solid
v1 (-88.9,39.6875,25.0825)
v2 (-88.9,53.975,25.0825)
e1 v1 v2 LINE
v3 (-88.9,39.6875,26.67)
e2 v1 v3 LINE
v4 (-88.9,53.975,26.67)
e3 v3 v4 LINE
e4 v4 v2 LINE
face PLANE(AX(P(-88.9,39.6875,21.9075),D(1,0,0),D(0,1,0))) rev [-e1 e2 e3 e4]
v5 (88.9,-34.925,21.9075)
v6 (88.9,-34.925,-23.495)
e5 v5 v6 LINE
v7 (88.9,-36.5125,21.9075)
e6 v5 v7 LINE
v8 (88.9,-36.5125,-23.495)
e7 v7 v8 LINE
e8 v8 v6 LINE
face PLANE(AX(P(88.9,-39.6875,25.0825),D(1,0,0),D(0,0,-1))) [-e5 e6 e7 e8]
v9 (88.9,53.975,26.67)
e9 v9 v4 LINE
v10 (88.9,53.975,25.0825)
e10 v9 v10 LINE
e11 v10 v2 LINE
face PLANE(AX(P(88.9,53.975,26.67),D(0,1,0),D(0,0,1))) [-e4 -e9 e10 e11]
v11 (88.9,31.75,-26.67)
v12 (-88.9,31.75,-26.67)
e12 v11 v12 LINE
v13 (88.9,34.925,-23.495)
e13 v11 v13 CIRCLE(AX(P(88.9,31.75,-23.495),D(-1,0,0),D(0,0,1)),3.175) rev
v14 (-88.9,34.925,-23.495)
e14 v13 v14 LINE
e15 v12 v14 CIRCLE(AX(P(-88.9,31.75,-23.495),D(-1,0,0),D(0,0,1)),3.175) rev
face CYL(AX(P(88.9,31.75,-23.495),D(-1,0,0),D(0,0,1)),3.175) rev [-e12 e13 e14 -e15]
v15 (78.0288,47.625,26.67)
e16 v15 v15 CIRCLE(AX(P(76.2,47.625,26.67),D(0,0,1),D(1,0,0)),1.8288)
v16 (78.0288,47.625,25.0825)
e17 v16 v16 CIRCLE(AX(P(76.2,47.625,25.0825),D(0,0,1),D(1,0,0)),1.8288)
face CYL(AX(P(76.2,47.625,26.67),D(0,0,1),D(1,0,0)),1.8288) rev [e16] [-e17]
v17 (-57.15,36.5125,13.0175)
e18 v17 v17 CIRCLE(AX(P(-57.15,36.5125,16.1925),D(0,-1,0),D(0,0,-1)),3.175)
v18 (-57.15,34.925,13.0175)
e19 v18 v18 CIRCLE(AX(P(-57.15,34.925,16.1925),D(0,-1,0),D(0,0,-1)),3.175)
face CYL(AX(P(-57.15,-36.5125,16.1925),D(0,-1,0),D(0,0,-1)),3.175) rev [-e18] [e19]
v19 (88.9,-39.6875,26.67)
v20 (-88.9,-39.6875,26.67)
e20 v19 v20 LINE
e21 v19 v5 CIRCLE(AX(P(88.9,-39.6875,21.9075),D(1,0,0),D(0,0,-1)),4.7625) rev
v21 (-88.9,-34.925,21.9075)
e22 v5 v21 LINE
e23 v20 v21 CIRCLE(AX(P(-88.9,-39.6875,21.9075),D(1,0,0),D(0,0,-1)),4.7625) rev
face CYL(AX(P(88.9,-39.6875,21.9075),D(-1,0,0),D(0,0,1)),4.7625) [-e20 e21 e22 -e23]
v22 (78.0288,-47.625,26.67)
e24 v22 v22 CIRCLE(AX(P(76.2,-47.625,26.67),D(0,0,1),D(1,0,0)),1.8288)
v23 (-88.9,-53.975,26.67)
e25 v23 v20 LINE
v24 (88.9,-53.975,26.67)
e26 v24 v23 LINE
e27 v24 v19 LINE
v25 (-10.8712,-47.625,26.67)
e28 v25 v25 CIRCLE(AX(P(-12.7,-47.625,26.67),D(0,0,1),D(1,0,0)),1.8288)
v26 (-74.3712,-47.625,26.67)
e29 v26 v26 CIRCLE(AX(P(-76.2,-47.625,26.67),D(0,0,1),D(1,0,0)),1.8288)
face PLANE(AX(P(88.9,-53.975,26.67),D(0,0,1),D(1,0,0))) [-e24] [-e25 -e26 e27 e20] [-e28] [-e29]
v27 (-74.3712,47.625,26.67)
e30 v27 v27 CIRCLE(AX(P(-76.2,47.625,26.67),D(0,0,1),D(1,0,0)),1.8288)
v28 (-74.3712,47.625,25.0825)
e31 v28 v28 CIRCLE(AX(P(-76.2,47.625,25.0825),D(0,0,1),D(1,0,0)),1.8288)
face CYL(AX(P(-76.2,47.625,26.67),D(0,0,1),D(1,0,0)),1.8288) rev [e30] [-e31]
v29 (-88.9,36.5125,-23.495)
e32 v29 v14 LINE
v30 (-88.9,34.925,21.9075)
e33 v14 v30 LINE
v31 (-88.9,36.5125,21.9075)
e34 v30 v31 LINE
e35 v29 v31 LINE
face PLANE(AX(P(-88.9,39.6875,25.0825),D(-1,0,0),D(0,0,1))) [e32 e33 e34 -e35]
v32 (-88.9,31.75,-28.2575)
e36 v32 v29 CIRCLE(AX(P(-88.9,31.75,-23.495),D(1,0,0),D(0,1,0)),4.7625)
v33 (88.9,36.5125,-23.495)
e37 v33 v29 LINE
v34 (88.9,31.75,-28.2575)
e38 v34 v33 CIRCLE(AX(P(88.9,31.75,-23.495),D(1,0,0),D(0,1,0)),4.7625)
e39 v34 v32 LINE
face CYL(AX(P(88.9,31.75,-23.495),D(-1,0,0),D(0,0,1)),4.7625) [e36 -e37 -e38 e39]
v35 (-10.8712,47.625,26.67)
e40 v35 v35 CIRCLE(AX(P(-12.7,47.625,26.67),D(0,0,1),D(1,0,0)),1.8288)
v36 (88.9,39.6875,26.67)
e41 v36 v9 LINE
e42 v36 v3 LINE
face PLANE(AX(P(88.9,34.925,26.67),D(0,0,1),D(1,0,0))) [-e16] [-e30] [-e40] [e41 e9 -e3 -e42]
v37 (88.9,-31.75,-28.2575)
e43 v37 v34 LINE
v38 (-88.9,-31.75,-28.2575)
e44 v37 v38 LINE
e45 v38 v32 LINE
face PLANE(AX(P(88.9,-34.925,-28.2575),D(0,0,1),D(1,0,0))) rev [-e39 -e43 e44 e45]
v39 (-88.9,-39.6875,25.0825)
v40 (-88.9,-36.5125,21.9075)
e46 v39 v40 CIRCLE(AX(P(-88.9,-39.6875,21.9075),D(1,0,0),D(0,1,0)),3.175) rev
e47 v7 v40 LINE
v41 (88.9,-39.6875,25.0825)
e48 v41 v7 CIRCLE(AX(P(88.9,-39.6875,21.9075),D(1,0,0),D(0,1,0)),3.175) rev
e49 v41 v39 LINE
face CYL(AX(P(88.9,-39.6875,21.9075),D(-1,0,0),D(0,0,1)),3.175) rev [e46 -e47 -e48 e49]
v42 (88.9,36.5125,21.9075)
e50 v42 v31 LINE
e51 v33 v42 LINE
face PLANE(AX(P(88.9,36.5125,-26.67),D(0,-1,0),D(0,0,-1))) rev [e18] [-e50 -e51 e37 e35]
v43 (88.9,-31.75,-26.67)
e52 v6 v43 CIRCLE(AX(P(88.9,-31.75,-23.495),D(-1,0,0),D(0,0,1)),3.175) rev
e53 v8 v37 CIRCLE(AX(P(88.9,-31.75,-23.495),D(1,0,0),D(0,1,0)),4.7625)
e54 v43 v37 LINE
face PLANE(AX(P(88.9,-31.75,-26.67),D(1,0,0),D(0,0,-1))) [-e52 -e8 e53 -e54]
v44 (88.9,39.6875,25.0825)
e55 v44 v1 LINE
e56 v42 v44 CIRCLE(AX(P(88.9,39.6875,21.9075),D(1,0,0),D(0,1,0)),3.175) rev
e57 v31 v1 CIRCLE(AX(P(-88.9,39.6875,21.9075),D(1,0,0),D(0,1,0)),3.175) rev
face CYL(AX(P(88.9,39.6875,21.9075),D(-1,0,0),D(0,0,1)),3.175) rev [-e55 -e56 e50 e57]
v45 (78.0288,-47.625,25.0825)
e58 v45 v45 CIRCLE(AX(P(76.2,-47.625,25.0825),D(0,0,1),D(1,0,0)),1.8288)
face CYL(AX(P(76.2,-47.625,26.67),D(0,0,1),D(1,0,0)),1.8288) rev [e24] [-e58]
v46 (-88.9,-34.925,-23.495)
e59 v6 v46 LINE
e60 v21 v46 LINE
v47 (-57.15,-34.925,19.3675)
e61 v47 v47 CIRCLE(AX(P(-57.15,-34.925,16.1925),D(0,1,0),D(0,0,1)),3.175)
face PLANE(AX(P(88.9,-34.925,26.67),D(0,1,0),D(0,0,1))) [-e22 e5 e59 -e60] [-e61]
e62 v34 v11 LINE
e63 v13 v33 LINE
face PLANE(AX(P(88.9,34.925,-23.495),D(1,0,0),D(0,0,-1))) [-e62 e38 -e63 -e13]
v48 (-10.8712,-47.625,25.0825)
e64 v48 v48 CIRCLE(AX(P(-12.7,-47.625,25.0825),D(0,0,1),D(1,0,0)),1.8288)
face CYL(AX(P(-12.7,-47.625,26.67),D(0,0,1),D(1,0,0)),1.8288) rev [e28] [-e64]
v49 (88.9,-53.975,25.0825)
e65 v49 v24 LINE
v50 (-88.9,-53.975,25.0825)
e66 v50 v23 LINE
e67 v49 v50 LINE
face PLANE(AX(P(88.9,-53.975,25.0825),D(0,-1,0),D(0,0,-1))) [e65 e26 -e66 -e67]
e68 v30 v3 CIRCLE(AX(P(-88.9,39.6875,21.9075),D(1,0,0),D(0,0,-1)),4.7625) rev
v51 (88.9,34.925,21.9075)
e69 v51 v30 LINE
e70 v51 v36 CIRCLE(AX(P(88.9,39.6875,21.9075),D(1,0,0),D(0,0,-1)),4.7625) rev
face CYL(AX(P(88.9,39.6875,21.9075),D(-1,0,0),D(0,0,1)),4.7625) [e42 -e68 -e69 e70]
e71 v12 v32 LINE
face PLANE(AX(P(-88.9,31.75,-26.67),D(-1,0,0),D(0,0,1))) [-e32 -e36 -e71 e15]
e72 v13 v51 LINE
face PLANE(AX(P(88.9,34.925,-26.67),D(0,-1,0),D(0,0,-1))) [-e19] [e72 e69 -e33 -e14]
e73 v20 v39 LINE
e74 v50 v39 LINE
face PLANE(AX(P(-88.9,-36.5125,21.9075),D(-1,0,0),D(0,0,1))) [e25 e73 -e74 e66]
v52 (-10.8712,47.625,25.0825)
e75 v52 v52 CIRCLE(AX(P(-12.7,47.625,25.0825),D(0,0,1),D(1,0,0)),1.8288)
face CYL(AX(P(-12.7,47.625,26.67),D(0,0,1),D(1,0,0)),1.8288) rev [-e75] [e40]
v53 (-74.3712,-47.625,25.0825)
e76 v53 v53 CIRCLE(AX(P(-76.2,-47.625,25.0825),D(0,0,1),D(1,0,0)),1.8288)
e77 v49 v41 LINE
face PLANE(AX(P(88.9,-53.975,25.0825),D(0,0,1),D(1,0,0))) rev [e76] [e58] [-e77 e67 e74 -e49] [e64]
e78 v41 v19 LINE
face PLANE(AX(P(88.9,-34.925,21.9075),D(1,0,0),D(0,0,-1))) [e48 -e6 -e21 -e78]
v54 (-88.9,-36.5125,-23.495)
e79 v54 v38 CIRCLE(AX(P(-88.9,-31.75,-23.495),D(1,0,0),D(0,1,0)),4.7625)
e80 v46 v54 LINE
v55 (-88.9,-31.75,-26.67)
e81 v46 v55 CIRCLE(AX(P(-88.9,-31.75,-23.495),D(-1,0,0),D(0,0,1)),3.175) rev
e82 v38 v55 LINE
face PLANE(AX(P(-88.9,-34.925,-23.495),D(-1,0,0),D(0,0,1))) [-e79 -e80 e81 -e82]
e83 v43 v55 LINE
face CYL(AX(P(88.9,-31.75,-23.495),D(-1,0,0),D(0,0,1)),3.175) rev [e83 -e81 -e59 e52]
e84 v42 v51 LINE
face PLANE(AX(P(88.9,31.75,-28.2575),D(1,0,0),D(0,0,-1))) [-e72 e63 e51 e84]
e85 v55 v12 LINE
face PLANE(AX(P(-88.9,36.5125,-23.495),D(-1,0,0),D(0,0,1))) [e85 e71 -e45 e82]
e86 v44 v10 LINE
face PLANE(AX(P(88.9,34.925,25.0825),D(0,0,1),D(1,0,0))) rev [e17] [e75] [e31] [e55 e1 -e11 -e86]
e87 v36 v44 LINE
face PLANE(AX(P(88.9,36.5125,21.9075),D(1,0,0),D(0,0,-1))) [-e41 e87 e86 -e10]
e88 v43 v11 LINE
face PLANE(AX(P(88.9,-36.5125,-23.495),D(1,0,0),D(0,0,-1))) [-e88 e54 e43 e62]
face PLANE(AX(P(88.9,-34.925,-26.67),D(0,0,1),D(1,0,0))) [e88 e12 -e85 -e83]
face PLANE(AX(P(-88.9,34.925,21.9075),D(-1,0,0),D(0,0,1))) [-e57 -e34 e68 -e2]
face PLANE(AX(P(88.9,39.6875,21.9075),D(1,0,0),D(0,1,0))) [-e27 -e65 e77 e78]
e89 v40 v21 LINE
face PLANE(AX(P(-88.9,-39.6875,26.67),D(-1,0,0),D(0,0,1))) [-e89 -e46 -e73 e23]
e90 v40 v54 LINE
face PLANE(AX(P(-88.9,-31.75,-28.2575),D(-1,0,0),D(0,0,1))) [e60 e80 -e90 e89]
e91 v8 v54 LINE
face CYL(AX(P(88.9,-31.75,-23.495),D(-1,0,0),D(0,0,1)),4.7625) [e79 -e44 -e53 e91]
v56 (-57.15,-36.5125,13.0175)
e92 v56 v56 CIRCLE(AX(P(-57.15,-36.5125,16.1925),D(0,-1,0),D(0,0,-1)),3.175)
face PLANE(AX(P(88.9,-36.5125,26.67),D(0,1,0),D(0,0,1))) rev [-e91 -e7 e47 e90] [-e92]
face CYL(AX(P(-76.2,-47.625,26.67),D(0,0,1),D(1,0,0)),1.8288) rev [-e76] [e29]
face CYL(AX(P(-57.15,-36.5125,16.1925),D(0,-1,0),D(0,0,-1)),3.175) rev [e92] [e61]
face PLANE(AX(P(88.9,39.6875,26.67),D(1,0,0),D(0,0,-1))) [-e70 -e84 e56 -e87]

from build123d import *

# Parameters (mm, degrees)
BASE_FLANGE1_DEPTH          = 88.9
F_27_0_144_DIAMETER_HOLE1_D = 3.6576
F_1_4_0_25_DIAMETER_HOLE1_D = 6.35


# Sheet-metal steps are written as plain solids
with BuildPart() as part:
    # Sketch1 → Base-Flange1 (new, symmetric)
    with BuildSketch(Plane.YZ):
        with BuildLine():
            Line((-53.975, 26.67), (-39.6875, 26.67))
            ThreePointArc((-39.6875, 26.67), (-36.319903955, 25.275096045), (-34.925, 21.9075))
            Line((-34.925, 21.9075), (-34.925, -23.495))
            ThreePointArc((-34.925, -23.495), (-33.99506403, -25.74006403), (-31.75, -26.67))
            Line((-31.75, -26.67), (31.75, -26.67))
            ThreePointArc((31.75, -26.67), (33.99506403, -25.74006403), (34.925, -23.495))
            Line((34.925, -23.495), (34.925, 21.9075))
            ThreePointArc((34.925, 21.9075), (36.319903955, 25.275096045), (39.6875, 26.67))
            Line((39.6875, 26.67), (53.975, 26.67))
            Line((53.975, 26.67), (53.975, 25.0825))
            Line((53.975, 25.0825), (39.6875, 25.0825))
            ThreePointArc((39.6875, 25.0825), (37.44243597, 24.15256403), (36.5125, 21.9075))
            Line((36.5125, 21.9075), (36.5125, -23.495))
            ThreePointArc((36.5125, -23.495), (35.117596045, -26.862596045), (31.75, -28.2575))
            Line((31.75, -28.2575), (-31.75, -28.2575))
            ThreePointArc((-31.75, -28.2575), (-35.117596045, -26.862596045), (-36.5125, -23.495))
            Line((-36.5125, -23.495), (-36.5125, 21.9075))
            ThreePointArc((-36.5125, 21.9075), (-37.44243597, 24.15256403), (-39.6875, 25.0825))
            Line((-39.6875, 25.0825), (-53.975, 25.0825))
            Line((-53.975, 25.0825), (-53.975, 26.67))
        make_face()
    extrude(amount=BASE_FLANGE1_DEPTH, both=True)

    # #27 (0.144) Diameter Hole1 (through all)
    with Locations(Plane.XY.offset(26.67)):
        with Locations((-76.2, 47.625), (-12.7, 47.625), (76.2, 47.625), (76.2, -47.625), (-12.7, -47.625), (-76.2, -47.625)):
            Hole(F_27_0_144_DIAMETER_HOLE1_D / 2)

    # 1/4 (0.25) Diameter Hole1 (through all)
    with Locations(Plane.XZ.offset(36.5125)):
        with Locations((-57.15, 16.1925)):
            Hole(F_1_4_0_25_DIAMETER_HOLE1_D / 2)


solid = part.part
